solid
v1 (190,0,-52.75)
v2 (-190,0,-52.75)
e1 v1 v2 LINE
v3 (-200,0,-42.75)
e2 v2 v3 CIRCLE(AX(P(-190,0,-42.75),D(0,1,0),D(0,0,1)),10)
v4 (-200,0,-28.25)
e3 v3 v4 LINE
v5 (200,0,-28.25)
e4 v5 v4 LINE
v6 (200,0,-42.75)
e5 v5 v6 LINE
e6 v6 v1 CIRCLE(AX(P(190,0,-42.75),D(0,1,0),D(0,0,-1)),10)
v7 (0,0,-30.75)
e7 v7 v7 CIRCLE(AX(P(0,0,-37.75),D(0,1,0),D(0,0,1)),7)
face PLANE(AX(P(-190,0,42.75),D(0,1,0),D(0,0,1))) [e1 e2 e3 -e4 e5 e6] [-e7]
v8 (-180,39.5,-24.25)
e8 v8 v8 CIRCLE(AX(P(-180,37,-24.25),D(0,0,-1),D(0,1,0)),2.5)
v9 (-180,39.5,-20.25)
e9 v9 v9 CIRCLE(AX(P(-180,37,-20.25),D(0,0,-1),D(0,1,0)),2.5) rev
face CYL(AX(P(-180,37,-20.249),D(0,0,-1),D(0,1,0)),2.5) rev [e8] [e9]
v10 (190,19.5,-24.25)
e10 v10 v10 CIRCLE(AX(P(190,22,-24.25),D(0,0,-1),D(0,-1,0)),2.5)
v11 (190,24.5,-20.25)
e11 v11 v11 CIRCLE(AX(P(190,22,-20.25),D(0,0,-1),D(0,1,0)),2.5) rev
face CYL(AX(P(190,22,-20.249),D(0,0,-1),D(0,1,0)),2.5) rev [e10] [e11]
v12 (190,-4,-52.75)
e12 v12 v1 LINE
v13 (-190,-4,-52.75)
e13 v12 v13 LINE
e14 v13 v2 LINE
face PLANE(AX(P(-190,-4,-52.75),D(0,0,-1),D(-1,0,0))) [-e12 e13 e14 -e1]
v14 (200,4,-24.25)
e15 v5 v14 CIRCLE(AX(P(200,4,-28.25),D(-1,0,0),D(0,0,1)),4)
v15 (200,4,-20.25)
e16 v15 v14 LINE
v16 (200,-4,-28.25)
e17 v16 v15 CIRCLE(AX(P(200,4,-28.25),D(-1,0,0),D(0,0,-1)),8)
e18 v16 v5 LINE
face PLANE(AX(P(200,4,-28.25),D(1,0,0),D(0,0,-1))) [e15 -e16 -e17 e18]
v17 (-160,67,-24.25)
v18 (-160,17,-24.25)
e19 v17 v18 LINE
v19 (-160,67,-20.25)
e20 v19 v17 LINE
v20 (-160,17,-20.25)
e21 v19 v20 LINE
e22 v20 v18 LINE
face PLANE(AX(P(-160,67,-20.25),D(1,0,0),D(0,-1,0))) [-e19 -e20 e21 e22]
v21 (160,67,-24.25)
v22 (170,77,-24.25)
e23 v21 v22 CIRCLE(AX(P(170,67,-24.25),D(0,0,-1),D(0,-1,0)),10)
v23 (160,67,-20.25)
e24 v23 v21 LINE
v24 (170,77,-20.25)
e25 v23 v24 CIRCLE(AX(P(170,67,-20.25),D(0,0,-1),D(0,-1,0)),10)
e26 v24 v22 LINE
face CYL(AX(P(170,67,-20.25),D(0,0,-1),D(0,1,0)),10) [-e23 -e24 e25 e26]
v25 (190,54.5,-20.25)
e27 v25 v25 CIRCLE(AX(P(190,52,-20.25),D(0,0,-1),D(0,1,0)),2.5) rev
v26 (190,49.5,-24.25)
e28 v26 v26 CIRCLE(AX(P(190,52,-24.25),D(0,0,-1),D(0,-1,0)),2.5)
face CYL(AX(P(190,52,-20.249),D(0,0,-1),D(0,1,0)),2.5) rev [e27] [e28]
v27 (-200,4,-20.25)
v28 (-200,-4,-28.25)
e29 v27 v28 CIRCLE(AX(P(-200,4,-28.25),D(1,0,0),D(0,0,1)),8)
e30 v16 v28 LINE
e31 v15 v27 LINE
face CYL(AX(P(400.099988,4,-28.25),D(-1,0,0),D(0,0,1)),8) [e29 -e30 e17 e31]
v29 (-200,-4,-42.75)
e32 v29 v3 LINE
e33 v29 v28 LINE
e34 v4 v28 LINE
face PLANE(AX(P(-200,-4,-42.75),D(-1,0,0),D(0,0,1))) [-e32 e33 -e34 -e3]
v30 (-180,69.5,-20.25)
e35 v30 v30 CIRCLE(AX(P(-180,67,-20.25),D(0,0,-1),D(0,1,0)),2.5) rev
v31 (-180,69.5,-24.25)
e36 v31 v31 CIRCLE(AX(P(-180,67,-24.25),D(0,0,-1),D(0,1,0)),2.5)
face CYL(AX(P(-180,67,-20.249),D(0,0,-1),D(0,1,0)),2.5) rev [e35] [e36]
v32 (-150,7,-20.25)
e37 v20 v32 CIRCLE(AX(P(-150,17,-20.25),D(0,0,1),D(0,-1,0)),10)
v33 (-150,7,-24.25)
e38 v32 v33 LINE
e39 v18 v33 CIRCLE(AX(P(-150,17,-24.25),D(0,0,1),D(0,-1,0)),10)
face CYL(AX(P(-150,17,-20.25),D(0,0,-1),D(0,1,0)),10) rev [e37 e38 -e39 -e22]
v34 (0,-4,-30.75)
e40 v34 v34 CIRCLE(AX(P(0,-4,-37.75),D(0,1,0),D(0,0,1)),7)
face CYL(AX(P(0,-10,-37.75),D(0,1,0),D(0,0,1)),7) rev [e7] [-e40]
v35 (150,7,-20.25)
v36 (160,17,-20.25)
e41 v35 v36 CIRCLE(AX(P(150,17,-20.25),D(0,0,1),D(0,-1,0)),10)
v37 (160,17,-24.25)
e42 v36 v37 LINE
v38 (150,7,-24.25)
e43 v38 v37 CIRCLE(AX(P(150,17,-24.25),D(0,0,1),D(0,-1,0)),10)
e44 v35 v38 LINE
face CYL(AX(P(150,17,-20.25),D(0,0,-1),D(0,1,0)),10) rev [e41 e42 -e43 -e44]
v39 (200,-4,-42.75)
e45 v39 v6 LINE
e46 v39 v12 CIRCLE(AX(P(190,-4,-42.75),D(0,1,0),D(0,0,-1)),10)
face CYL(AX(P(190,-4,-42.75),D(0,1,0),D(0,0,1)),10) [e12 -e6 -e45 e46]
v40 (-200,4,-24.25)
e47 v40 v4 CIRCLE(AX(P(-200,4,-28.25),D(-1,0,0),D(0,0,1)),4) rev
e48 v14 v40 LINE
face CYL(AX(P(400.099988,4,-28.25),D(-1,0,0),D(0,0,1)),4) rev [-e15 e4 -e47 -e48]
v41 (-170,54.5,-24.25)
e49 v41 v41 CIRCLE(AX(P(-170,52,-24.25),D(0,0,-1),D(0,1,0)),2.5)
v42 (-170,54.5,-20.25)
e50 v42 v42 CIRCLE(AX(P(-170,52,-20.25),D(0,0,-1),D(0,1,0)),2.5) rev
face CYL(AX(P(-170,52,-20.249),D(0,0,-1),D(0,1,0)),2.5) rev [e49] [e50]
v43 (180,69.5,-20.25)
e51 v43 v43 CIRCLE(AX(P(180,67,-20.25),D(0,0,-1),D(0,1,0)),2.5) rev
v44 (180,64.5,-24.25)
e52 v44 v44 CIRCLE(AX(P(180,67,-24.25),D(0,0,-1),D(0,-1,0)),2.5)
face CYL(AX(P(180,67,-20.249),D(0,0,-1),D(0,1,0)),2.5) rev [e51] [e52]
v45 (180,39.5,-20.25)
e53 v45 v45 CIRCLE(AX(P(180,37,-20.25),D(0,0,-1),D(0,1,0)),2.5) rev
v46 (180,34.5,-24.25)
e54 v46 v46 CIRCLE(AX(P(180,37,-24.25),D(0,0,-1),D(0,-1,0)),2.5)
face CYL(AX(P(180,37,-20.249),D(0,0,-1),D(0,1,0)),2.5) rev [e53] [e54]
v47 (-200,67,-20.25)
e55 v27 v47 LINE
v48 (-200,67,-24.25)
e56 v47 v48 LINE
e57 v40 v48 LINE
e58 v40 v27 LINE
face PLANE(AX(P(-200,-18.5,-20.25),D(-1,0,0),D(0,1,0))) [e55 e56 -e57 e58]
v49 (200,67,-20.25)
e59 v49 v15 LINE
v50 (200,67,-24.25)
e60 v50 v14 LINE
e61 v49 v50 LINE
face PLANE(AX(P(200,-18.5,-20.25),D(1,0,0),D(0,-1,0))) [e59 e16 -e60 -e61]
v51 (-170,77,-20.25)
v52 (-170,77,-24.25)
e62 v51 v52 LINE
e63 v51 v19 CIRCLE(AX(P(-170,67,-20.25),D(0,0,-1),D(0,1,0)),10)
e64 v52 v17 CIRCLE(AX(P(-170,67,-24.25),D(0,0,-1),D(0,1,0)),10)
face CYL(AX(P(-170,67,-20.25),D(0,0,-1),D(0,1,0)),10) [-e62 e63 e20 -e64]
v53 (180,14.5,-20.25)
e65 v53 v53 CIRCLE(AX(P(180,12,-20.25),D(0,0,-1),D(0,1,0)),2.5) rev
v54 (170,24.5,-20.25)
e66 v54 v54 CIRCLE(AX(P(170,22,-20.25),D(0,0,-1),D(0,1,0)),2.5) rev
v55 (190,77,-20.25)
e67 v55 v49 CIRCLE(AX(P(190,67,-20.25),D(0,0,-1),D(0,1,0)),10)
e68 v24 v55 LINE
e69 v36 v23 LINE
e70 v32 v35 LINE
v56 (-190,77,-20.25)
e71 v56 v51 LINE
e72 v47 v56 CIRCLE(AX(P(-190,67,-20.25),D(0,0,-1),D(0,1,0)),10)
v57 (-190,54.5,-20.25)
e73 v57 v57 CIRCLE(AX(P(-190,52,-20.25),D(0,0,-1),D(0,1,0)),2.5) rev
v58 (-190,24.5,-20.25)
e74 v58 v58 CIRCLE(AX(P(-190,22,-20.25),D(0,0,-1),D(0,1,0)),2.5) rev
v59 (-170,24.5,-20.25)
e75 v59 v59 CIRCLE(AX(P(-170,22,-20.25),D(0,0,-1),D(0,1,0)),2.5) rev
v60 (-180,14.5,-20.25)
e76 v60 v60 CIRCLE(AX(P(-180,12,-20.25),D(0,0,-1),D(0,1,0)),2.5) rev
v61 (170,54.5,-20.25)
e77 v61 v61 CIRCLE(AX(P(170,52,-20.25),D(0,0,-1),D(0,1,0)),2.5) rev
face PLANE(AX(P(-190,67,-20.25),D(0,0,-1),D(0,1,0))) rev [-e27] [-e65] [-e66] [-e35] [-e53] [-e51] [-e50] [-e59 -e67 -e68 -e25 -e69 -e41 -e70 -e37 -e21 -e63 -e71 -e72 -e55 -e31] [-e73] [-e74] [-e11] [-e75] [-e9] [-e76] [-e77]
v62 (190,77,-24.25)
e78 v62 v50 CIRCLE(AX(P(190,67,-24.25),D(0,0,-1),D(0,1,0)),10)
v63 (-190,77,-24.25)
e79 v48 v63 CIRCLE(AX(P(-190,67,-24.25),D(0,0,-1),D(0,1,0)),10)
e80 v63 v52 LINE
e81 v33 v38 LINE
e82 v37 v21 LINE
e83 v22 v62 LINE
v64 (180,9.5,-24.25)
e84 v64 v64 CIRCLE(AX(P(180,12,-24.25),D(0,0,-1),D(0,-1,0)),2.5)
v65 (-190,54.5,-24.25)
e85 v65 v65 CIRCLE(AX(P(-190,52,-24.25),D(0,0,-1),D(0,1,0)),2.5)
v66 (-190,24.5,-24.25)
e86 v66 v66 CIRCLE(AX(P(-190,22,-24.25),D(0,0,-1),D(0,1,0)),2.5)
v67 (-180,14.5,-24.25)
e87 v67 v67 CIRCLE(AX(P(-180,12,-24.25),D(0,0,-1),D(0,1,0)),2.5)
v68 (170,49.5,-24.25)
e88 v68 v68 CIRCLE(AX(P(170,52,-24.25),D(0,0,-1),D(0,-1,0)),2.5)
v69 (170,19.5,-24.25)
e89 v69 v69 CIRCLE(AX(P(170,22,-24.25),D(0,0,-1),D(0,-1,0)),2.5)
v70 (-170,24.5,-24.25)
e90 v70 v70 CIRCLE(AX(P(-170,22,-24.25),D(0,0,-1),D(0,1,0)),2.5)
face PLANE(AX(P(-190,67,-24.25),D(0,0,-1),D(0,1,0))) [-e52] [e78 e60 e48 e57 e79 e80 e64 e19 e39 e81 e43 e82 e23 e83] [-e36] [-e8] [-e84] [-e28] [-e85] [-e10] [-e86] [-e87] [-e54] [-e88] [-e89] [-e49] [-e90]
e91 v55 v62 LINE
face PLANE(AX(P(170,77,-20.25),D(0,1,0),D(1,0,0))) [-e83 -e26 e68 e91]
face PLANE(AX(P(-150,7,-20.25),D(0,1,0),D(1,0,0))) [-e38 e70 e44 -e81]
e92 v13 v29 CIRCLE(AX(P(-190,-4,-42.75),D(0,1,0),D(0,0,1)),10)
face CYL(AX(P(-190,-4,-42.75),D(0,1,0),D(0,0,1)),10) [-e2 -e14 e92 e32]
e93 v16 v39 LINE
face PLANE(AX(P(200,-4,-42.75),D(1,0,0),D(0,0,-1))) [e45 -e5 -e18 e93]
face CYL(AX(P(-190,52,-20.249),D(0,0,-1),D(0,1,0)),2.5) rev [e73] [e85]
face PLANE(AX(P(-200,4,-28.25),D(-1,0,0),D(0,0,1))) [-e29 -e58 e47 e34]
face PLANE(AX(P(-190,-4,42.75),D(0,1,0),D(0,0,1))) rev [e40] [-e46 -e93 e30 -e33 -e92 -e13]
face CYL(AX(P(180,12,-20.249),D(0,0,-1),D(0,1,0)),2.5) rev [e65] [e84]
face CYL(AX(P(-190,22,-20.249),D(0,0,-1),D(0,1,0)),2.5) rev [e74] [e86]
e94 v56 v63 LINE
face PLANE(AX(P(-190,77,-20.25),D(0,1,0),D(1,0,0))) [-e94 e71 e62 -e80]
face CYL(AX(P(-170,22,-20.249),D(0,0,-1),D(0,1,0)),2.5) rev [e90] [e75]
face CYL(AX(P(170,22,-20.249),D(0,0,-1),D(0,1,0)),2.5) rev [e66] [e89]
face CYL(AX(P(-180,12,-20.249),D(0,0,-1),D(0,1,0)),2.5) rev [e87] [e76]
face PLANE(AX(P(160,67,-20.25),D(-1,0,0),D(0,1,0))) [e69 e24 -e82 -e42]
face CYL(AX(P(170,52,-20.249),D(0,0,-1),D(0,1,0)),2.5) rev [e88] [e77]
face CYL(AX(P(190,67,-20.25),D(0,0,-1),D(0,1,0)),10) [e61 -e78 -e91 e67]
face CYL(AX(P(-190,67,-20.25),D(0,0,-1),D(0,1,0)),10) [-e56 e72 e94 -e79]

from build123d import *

# Parameters (mm, degrees)
BRIDA_BASE1_DEPTH             = 4
PLIEGUE_START                 = -21.07192
PLIEGUE_CROQUIZADO1_OUTLINE_W = 400
PLIEGUE_CROQUIZADO1_OUTLINE_H = 4
PLIEGUE_CROQUIZADO1_DEPTH     = 73.82192
PLIEGUE_START_2               = -24.25
PLIEGUE_CROQUIZADO1_2_DEPTH   = 0.02192
PLIEGUE_START_3               = -28.25
PLIEGUE_CROQUIZADO1_3_DEPTH   = 8
PLIEGUE_START_4               = -200
PLIEGUE_CROQUIZADO1_4_DEPTH   = 400
CROQUIS8_R                    = 7
CORTAR_EXTRUIR2_DEPTH         = 10
CORTAR_EXTRUIR3_REACH         = 218.197
CROQUIS9_R                    = 2.5


with BuildPart() as part:
    # Brida base1: sheet metal written as solids
    # Croquis1 → Brida base1 (new body)
    with BuildSketch(Plane(origin=(0, 0, 0), x_dir=(1, 0, 0), z_dir=(0, 1, 0))):
        with BuildLine():
            Line((170, -52.75), (190, -52.75))
            ThreePointArc((190, -52.75), (197.071067812, -49.821067812), (200, -42.75))
            Line((200, -42.75), (200, 42.75))
            ThreePointArc((200, 42.75), (197.071067812, 49.821067812), (190, 52.75))
            Line((190, 52.75), (-190, 52.75))
            ThreePointArc((-190, 52.75), (-197.071067812, 49.821067812), (-200, 42.75))
            Line((-200, 42.75), (-200, -42.75))
            ThreePointArc((-200, -42.75), (-197.071067812, -49.821067812), (-190, -52.75))
            Line((-190, -52.75), (-170, -52.75))
            ThreePointArc((-170, -52.75), (-162.928932188, -49.821067812), (-160, -42.75))
            Line((-160, -42.75), (-160, 7.25))
            ThreePointArc((-160, 7.25), (-157.071067812, 14.321067812), (-150, 17.25))
            Line((-150, 17.25), (150, 17.25))
            ThreePointArc((150, 17.25), (157.071067812, 14.321067812), (160, 7.25))
            Line((160, 7.25), (160, -42.75))
            ThreePointArc((160, -42.75), (162.928932188, -49.821067812), (170, -52.75))
        make_face()
    extrude(amount=-BRIDA_BASE1_DEPTH)

    # Pliegue croquizado1: read off the stored shape, not the designer's step
    # Pliegue croquizado1 outline → Pliegue croquizado1 (cut)
    with BuildSketch(Plane.XY.offset(PLIEGUE_START)):
        with Locations((0, -2)):
            Rectangle(PLIEGUE_CROQUIZADO1_OUTLINE_W, PLIEGUE_CROQUIZADO1_OUTLINE_H)
    extrude(amount=PLIEGUE_CROQUIZADO1_DEPTH, mode=Mode.SUBTRACT)

    # Pliegue croquizado1 2 outline → Pliegue croquizado1 2 (add)
    with BuildSketch(Plane.XY.offset(PLIEGUE_START_2)):
        with BuildLine():
            ThreePointArc((-190, 76.999999998), (-197.071067812, 74.07106781), (-200, 66.999999998))
            Line((-200, 66.999999998), (-200, 0))
            Line((-200, 0), (200, 0))
            Line((200, 0), (200, 66.999999998))
            ThreePointArc((200, 66.999999998), (197.071067812, 74.07106781), (190, 76.999999998))
            Line((190, 76.999999998), (170, 76.999999998))
            ThreePointArc((170, 76.999999998), (162.928932188, 74.07106781), (160, 66.999999998))
            Line((160, 66.999999998), (160, 16.999999998))
            ThreePointArc((160, 16.999999998), (157.071067812, 9.928932186), (150, 6.999999998))
            Line((150, 6.999999998), (-150, 6.999999998))
            ThreePointArc((-150, 6.999999998), (-157.071067812, 9.928932186), (-160, 16.999999998))
            Line((-160, 16.999999998), (-160, 66.999999998))
            ThreePointArc((-160, 66.999999998), (-162.928932188, 74.07106781), (-170, 76.999999998))
            Line((-170, 76.999999998), (-190, 76.999999998))
        make_face()
    extrude(amount=PLIEGUE_CROQUIZADO1_2_DEPTH)

    # Pliegue croquizado1 3 outline → Pliegue croquizado1 3 (add)
    with BuildSketch(Plane.XY.offset(PLIEGUE_START_3)):
        with BuildLine():
            ThreePointArc((-190, 76.999999998), (-197.071067812, 74.07106781), (-200, 66.999999998))
            Line((-200, 66.999999998), (-200, 0))
            Line((-200, 0), (200, 0))
            Line((200, 0), (200, 66.999999998))
            ThreePointArc((200, 66.999999998), (197.071067812, 74.07106781), (190, 76.999999998))
            Line((190, 76.999999998), (170, 76.999999998))
            ThreePointArc((170, 76.999999998), (162.928932188, 74.07106781), (160, 66.999999998))
            Line((160, 66.999999998), (160, 16.999999998))
            ThreePointArc((160, 16.999999998), (157.071067812, 9.928932186), (150, 6.999999998))
            Line((150, 6.999999998), (-150, 6.999999998))
            ThreePointArc((-150, 6.999999998), (-157.071067812, 9.928932186), (-160, 16.999999998))
            Line((-160, 16.999999998), (-160, 66.999999998))
            ThreePointArc((-160, 66.999999998), (-162.928932188, 74.07106781), (-170, 76.999999998))
            Line((-170, 76.999999998), (-190, 76.999999998))
        make_face()
    extrude(amount=PLIEGUE_CROQUIZADO1_3_DEPTH)

    # Pliegue croquizado1 4 outline → Pliegue croquizado1 4 (cut)
    with BuildSketch(Plane.YZ.offset(PLIEGUE_START_4)):
        with BuildLine():
            ThreePointArc((-4, -28.25), (-1.656854249, -22.593145751), (4, -20.25))
            Line((4, -20.25), (0, -20.25))
            Line((0, -20.25), (0, -21.07192))
            Line((0, -21.07192), (-4, -21.07192))
            Line((-4, -21.07192), (-4, -28.25))
        make_face()
        with BuildLine():
            ThreePointArc((4, -24.25), (1.171572875, -25.421572875), (0, -28.25))
            Line((0, -28.25), (76.999999998, -28.25))
            Line((76.999999998, -28.25), (76.999999998, -24.25))
            Line((76.999999998, -24.25), (4, -24.25))
        make_face()
    extrude(amount=PLIEGUE_CROQUIZADO1_4_DEPTH, mode=Mode.SUBTRACT)

    # Croquis8 → Cortar-Extruir2 (cut)
    with BuildSketch(Plane(origin=(0, 0, 0), x_dir=(1, 0, 0), z_dir=(0, 1, 0))):
        with Locations(Location((0, 37.75, 0), (0, 0, 270))):
            Circle(CROQUIS8_R)
    extrude(amount=-CORTAR_EXTRUIR2_DEPTH, mode=Mode.SUBTRACT)

    # Croquis9 → Cortar-Extruir3 (cut, up to next)
    with BuildSketch(Plane(origin=(0, 0, -24.25), x_dir=(-1, 0, 0), z_dir=(0, 0, -1)), mode=Mode.PRIVATE) as cortar_extruir3_sk1:
        with Locations(Location((180, 11.999999998, 0), (0, 0, 90))):
            Circle(CROQUIS9_R)
    cortar_extruir3_tool1 = extrude(cortar_extruir3_sk1.sketch, amount=-CORTAR_EXTRUIR3_REACH, mode=Mode.PRIVATE) & part.part
    # Croquis9 → Cortar-Extruir3 (cut, up to next)
    with BuildSketch(Plane(origin=(0, 0, -24.25), x_dir=(-1, 0, 0), z_dir=(0, 0, -1)), mode=Mode.PRIVATE) as cortar_extruir3_sk2:
        with Locations(Location((180, 66.999999998, 0), (0, 0, 90))):
            Circle(CROQUIS9_R)
    cortar_extruir3_tool2 = extrude(cortar_extruir3_sk2.sketch, amount=-CORTAR_EXTRUIR3_REACH, mode=Mode.PRIVATE) & part.part
    # Croquis9 → Cortar-Extruir3 (cut, up to next)
    with BuildSketch(Plane(origin=(0, 0, -24.25), x_dir=(-1, 0, 0), z_dir=(0, 0, -1)), mode=Mode.PRIVATE) as cortar_extruir3_sk3:
        with Locations(Location((170, 51.999999998, 0), (0, 0, 90))):
            Circle(CROQUIS9_R)
    cortar_extruir3_tool3 = extrude(cortar_extruir3_sk3.sketch, amount=-CORTAR_EXTRUIR3_REACH, mode=Mode.PRIVATE) & part.part
    # Croquis9 → Cortar-Extruir3 (cut, up to next)
    with BuildSketch(Plane(origin=(0, 0, -24.25), x_dir=(-1, 0, 0), z_dir=(0, 0, -1)), mode=Mode.PRIVATE) as cortar_extruir3_sk4:
        with Locations(Location((190, 51.999999998, 0), (0, 0, 90))):
            Circle(CROQUIS9_R)
    cortar_extruir3_tool4 = extrude(cortar_extruir3_sk4.sketch, amount=-CORTAR_EXTRUIR3_REACH, mode=Mode.PRIVATE) & part.part
    # Croquis9 → Cortar-Extruir3 (cut, up to next)
    with BuildSketch(Plane(origin=(0, 0, -24.25), x_dir=(-1, 0, 0), z_dir=(0, 0, -1)), mode=Mode.PRIVATE) as cortar_extruir3_sk5:
        with Locations(Location((180, 36.999999998, 0), (0, 0, 90))):
            Circle(CROQUIS9_R)
    cortar_extruir3_tool5 = extrude(cortar_extruir3_sk5.sketch, amount=-CORTAR_EXTRUIR3_REACH, mode=Mode.PRIVATE) & part.part
    # Croquis9 → Cortar-Extruir3 (cut, up to next)
    with BuildSketch(Plane(origin=(0, 0, -24.25), x_dir=(-1, 0, 0), z_dir=(0, 0, -1)), mode=Mode.PRIVATE) as cortar_extruir3_sk6:
        with Locations(Location((170, 21.999999998, 0), (0, 0, 90))):
            Circle(CROQUIS9_R)
    cortar_extruir3_tool6 = extrude(cortar_extruir3_sk6.sketch, amount=-CORTAR_EXTRUIR3_REACH, mode=Mode.PRIVATE) & part.part
    # Croquis9 → Cortar-Extruir3 (cut, up to next)
    with BuildSketch(Plane(origin=(0, 0, -24.25), x_dir=(-1, 0, 0), z_dir=(0, 0, -1)), mode=Mode.PRIVATE) as cortar_extruir3_sk7:
        with Locations(Location((190, 21.999999998, 0), (0, 0, 90))):
            Circle(CROQUIS9_R)
    cortar_extruir3_tool7 = extrude(cortar_extruir3_sk7.sketch, amount=-CORTAR_EXTRUIR3_REACH, mode=Mode.PRIVATE) & part.part
    # Croquis9 → Cortar-Extruir3 (cut, up to next)
    with BuildSketch(Plane(origin=(0, 0, -24.25), x_dir=(-1, 0, 0), z_dir=(0, 0, -1)), mode=Mode.PRIVATE) as cortar_extruir3_sk8:
        with Locations(Location((-190, 21.999999998, 0), (0, 0, 90))):
            Circle(CROQUIS9_R)
    cortar_extruir3_tool8 = extrude(cortar_extruir3_sk8.sketch, amount=-CORTAR_EXTRUIR3_REACH, mode=Mode.PRIVATE) & part.part
    # Croquis9 → Cortar-Extruir3 (cut, up to next)
    with BuildSketch(Plane(origin=(0, 0, -24.25), x_dir=(-1, 0, 0), z_dir=(0, 0, -1)), mode=Mode.PRIVATE) as cortar_extruir3_sk9:
        with Locations(Location((-170, 21.999999998, 0), (0, 0, 90))):
            Circle(CROQUIS9_R)
    cortar_extruir3_tool9 = extrude(cortar_extruir3_sk9.sketch, amount=-CORTAR_EXTRUIR3_REACH, mode=Mode.PRIVATE) & part.part
    # Croquis9 → Cortar-Extruir3 (cut, up to next)
    with BuildSketch(Plane(origin=(0, 0, -24.25), x_dir=(-1, 0, 0), z_dir=(0, 0, -1)), mode=Mode.PRIVATE) as cortar_extruir3_sk10:
        with Locations(Location((-180, 36.999999998, 0), (0, 0, 90))):
            Circle(CROQUIS9_R)
    cortar_extruir3_tool10 = extrude(cortar_extruir3_sk10.sketch, amount=-CORTAR_EXTRUIR3_REACH, mode=Mode.PRIVATE) & part.part
    # Croquis9 → Cortar-Extruir3 (cut, up to next)
    with BuildSketch(Plane(origin=(0, 0, -24.25), x_dir=(-1, 0, 0), z_dir=(0, 0, -1)), mode=Mode.PRIVATE) as cortar_extruir3_sk11:
        with Locations(Location((-190, 51.999999998, 0), (0, 0, 90))):
            Circle(CROQUIS9_R)
    cortar_extruir3_tool11 = extrude(cortar_extruir3_sk11.sketch, amount=-CORTAR_EXTRUIR3_REACH, mode=Mode.PRIVATE) & part.part
    # Croquis9 → Cortar-Extruir3 (cut, up to next)
    with BuildSketch(Plane(origin=(0, 0, -24.25), x_dir=(-1, 0, 0), z_dir=(0, 0, -1)), mode=Mode.PRIVATE) as cortar_extruir3_sk12:
        with Locations(Location((-170, 51.999999998, 0), (0, 0, 90))):
            Circle(CROQUIS9_R)
    cortar_extruir3_tool12 = extrude(cortar_extruir3_sk12.sketch, amount=-CORTAR_EXTRUIR3_REACH, mode=Mode.PRIVATE) & part.part
    # Croquis9 → Cortar-Extruir3 (cut, up to next)
    with BuildSketch(Plane(origin=(0, 0, -24.25), x_dir=(-1, 0, 0), z_dir=(0, 0, -1)), mode=Mode.PRIVATE) as cortar_extruir3_sk13:
        with Locations(Location((-180, 66.999999998, 0), (0, 0, 90))):
            Circle(CROQUIS9_R)
    cortar_extruir3_tool13 = extrude(cortar_extruir3_sk13.sketch, amount=-CORTAR_EXTRUIR3_REACH, mode=Mode.PRIVATE) & part.part
    # Croquis9 → Cortar-Extruir3 (cut, up to next)
    with BuildSketch(Plane(origin=(0, 0, -24.25), x_dir=(-1, 0, 0), z_dir=(0, 0, -1)), mode=Mode.PRIVATE) as cortar_extruir3_sk14:
        with Locations(Location((-180, 11.999999998, 0), (0, 0, 90))):
            Circle(CROQUIS9_R)
    cortar_extruir3_tool14 = extrude(cortar_extruir3_sk14.sketch, amount=-CORTAR_EXTRUIR3_REACH, mode=Mode.PRIVATE) & part.part
    add(cortar_extruir3_tool1.solids().sort_by_distance((-180, 12, -24.25))[0], mode=Mode.SUBTRACT)
    add(cortar_extruir3_tool2.solids().sort_by_distance((-180, 67, -24.25))[0], mode=Mode.SUBTRACT)
    add(cortar_extruir3_tool3.solids().sort_by_distance((-170, 52, -24.25))[0], mode=Mode.SUBTRACT)
    add(cortar_extruir3_tool4.solids().sort_by_distance((-190, 52, -24.25))[0], mode=Mode.SUBTRACT)
    add(cortar_extruir3_tool5.solids().sort_by_distance((-180, 37, -24.25))[0], mode=Mode.SUBTRACT)
    add(cortar_extruir3_tool6.solids().sort_by_distance((-170, 22, -24.25))[0], mode=Mode.SUBTRACT)
    add(cortar_extruir3_tool7.solids().sort_by_distance((-190, 22, -24.25))[0], mode=Mode.SUBTRACT)
    add(cortar_extruir3_tool8.solids().sort_by_distance((190, 22, -24.25))[0], mode=Mode.SUBTRACT)
    add(cortar_extruir3_tool9.solids().sort_by_distance((170, 22, -24.25))[0], mode=Mode.SUBTRACT)
    add(cortar_extruir3_tool10.solids().sort_by_distance((180, 37, -24.25))[0], mode=Mode.SUBTRACT)
    add(cortar_extruir3_tool11.solids().sort_by_distance((190, 52, -24.25))[0], mode=Mode.SUBTRACT)
    add(cortar_extruir3_tool12.solids().sort_by_distance((170, 52, -24.25))[0], mode=Mode.SUBTRACT)
    add(cortar_extruir3_tool13.solids().sort_by_distance((180, 67, -24.25))[0], mode=Mode.SUBTRACT)
    add(cortar_extruir3_tool14.solids().sort_by_distance((180, 12, -24.25))[0], mode=Mode.SUBTRACT)


solid = part.part
